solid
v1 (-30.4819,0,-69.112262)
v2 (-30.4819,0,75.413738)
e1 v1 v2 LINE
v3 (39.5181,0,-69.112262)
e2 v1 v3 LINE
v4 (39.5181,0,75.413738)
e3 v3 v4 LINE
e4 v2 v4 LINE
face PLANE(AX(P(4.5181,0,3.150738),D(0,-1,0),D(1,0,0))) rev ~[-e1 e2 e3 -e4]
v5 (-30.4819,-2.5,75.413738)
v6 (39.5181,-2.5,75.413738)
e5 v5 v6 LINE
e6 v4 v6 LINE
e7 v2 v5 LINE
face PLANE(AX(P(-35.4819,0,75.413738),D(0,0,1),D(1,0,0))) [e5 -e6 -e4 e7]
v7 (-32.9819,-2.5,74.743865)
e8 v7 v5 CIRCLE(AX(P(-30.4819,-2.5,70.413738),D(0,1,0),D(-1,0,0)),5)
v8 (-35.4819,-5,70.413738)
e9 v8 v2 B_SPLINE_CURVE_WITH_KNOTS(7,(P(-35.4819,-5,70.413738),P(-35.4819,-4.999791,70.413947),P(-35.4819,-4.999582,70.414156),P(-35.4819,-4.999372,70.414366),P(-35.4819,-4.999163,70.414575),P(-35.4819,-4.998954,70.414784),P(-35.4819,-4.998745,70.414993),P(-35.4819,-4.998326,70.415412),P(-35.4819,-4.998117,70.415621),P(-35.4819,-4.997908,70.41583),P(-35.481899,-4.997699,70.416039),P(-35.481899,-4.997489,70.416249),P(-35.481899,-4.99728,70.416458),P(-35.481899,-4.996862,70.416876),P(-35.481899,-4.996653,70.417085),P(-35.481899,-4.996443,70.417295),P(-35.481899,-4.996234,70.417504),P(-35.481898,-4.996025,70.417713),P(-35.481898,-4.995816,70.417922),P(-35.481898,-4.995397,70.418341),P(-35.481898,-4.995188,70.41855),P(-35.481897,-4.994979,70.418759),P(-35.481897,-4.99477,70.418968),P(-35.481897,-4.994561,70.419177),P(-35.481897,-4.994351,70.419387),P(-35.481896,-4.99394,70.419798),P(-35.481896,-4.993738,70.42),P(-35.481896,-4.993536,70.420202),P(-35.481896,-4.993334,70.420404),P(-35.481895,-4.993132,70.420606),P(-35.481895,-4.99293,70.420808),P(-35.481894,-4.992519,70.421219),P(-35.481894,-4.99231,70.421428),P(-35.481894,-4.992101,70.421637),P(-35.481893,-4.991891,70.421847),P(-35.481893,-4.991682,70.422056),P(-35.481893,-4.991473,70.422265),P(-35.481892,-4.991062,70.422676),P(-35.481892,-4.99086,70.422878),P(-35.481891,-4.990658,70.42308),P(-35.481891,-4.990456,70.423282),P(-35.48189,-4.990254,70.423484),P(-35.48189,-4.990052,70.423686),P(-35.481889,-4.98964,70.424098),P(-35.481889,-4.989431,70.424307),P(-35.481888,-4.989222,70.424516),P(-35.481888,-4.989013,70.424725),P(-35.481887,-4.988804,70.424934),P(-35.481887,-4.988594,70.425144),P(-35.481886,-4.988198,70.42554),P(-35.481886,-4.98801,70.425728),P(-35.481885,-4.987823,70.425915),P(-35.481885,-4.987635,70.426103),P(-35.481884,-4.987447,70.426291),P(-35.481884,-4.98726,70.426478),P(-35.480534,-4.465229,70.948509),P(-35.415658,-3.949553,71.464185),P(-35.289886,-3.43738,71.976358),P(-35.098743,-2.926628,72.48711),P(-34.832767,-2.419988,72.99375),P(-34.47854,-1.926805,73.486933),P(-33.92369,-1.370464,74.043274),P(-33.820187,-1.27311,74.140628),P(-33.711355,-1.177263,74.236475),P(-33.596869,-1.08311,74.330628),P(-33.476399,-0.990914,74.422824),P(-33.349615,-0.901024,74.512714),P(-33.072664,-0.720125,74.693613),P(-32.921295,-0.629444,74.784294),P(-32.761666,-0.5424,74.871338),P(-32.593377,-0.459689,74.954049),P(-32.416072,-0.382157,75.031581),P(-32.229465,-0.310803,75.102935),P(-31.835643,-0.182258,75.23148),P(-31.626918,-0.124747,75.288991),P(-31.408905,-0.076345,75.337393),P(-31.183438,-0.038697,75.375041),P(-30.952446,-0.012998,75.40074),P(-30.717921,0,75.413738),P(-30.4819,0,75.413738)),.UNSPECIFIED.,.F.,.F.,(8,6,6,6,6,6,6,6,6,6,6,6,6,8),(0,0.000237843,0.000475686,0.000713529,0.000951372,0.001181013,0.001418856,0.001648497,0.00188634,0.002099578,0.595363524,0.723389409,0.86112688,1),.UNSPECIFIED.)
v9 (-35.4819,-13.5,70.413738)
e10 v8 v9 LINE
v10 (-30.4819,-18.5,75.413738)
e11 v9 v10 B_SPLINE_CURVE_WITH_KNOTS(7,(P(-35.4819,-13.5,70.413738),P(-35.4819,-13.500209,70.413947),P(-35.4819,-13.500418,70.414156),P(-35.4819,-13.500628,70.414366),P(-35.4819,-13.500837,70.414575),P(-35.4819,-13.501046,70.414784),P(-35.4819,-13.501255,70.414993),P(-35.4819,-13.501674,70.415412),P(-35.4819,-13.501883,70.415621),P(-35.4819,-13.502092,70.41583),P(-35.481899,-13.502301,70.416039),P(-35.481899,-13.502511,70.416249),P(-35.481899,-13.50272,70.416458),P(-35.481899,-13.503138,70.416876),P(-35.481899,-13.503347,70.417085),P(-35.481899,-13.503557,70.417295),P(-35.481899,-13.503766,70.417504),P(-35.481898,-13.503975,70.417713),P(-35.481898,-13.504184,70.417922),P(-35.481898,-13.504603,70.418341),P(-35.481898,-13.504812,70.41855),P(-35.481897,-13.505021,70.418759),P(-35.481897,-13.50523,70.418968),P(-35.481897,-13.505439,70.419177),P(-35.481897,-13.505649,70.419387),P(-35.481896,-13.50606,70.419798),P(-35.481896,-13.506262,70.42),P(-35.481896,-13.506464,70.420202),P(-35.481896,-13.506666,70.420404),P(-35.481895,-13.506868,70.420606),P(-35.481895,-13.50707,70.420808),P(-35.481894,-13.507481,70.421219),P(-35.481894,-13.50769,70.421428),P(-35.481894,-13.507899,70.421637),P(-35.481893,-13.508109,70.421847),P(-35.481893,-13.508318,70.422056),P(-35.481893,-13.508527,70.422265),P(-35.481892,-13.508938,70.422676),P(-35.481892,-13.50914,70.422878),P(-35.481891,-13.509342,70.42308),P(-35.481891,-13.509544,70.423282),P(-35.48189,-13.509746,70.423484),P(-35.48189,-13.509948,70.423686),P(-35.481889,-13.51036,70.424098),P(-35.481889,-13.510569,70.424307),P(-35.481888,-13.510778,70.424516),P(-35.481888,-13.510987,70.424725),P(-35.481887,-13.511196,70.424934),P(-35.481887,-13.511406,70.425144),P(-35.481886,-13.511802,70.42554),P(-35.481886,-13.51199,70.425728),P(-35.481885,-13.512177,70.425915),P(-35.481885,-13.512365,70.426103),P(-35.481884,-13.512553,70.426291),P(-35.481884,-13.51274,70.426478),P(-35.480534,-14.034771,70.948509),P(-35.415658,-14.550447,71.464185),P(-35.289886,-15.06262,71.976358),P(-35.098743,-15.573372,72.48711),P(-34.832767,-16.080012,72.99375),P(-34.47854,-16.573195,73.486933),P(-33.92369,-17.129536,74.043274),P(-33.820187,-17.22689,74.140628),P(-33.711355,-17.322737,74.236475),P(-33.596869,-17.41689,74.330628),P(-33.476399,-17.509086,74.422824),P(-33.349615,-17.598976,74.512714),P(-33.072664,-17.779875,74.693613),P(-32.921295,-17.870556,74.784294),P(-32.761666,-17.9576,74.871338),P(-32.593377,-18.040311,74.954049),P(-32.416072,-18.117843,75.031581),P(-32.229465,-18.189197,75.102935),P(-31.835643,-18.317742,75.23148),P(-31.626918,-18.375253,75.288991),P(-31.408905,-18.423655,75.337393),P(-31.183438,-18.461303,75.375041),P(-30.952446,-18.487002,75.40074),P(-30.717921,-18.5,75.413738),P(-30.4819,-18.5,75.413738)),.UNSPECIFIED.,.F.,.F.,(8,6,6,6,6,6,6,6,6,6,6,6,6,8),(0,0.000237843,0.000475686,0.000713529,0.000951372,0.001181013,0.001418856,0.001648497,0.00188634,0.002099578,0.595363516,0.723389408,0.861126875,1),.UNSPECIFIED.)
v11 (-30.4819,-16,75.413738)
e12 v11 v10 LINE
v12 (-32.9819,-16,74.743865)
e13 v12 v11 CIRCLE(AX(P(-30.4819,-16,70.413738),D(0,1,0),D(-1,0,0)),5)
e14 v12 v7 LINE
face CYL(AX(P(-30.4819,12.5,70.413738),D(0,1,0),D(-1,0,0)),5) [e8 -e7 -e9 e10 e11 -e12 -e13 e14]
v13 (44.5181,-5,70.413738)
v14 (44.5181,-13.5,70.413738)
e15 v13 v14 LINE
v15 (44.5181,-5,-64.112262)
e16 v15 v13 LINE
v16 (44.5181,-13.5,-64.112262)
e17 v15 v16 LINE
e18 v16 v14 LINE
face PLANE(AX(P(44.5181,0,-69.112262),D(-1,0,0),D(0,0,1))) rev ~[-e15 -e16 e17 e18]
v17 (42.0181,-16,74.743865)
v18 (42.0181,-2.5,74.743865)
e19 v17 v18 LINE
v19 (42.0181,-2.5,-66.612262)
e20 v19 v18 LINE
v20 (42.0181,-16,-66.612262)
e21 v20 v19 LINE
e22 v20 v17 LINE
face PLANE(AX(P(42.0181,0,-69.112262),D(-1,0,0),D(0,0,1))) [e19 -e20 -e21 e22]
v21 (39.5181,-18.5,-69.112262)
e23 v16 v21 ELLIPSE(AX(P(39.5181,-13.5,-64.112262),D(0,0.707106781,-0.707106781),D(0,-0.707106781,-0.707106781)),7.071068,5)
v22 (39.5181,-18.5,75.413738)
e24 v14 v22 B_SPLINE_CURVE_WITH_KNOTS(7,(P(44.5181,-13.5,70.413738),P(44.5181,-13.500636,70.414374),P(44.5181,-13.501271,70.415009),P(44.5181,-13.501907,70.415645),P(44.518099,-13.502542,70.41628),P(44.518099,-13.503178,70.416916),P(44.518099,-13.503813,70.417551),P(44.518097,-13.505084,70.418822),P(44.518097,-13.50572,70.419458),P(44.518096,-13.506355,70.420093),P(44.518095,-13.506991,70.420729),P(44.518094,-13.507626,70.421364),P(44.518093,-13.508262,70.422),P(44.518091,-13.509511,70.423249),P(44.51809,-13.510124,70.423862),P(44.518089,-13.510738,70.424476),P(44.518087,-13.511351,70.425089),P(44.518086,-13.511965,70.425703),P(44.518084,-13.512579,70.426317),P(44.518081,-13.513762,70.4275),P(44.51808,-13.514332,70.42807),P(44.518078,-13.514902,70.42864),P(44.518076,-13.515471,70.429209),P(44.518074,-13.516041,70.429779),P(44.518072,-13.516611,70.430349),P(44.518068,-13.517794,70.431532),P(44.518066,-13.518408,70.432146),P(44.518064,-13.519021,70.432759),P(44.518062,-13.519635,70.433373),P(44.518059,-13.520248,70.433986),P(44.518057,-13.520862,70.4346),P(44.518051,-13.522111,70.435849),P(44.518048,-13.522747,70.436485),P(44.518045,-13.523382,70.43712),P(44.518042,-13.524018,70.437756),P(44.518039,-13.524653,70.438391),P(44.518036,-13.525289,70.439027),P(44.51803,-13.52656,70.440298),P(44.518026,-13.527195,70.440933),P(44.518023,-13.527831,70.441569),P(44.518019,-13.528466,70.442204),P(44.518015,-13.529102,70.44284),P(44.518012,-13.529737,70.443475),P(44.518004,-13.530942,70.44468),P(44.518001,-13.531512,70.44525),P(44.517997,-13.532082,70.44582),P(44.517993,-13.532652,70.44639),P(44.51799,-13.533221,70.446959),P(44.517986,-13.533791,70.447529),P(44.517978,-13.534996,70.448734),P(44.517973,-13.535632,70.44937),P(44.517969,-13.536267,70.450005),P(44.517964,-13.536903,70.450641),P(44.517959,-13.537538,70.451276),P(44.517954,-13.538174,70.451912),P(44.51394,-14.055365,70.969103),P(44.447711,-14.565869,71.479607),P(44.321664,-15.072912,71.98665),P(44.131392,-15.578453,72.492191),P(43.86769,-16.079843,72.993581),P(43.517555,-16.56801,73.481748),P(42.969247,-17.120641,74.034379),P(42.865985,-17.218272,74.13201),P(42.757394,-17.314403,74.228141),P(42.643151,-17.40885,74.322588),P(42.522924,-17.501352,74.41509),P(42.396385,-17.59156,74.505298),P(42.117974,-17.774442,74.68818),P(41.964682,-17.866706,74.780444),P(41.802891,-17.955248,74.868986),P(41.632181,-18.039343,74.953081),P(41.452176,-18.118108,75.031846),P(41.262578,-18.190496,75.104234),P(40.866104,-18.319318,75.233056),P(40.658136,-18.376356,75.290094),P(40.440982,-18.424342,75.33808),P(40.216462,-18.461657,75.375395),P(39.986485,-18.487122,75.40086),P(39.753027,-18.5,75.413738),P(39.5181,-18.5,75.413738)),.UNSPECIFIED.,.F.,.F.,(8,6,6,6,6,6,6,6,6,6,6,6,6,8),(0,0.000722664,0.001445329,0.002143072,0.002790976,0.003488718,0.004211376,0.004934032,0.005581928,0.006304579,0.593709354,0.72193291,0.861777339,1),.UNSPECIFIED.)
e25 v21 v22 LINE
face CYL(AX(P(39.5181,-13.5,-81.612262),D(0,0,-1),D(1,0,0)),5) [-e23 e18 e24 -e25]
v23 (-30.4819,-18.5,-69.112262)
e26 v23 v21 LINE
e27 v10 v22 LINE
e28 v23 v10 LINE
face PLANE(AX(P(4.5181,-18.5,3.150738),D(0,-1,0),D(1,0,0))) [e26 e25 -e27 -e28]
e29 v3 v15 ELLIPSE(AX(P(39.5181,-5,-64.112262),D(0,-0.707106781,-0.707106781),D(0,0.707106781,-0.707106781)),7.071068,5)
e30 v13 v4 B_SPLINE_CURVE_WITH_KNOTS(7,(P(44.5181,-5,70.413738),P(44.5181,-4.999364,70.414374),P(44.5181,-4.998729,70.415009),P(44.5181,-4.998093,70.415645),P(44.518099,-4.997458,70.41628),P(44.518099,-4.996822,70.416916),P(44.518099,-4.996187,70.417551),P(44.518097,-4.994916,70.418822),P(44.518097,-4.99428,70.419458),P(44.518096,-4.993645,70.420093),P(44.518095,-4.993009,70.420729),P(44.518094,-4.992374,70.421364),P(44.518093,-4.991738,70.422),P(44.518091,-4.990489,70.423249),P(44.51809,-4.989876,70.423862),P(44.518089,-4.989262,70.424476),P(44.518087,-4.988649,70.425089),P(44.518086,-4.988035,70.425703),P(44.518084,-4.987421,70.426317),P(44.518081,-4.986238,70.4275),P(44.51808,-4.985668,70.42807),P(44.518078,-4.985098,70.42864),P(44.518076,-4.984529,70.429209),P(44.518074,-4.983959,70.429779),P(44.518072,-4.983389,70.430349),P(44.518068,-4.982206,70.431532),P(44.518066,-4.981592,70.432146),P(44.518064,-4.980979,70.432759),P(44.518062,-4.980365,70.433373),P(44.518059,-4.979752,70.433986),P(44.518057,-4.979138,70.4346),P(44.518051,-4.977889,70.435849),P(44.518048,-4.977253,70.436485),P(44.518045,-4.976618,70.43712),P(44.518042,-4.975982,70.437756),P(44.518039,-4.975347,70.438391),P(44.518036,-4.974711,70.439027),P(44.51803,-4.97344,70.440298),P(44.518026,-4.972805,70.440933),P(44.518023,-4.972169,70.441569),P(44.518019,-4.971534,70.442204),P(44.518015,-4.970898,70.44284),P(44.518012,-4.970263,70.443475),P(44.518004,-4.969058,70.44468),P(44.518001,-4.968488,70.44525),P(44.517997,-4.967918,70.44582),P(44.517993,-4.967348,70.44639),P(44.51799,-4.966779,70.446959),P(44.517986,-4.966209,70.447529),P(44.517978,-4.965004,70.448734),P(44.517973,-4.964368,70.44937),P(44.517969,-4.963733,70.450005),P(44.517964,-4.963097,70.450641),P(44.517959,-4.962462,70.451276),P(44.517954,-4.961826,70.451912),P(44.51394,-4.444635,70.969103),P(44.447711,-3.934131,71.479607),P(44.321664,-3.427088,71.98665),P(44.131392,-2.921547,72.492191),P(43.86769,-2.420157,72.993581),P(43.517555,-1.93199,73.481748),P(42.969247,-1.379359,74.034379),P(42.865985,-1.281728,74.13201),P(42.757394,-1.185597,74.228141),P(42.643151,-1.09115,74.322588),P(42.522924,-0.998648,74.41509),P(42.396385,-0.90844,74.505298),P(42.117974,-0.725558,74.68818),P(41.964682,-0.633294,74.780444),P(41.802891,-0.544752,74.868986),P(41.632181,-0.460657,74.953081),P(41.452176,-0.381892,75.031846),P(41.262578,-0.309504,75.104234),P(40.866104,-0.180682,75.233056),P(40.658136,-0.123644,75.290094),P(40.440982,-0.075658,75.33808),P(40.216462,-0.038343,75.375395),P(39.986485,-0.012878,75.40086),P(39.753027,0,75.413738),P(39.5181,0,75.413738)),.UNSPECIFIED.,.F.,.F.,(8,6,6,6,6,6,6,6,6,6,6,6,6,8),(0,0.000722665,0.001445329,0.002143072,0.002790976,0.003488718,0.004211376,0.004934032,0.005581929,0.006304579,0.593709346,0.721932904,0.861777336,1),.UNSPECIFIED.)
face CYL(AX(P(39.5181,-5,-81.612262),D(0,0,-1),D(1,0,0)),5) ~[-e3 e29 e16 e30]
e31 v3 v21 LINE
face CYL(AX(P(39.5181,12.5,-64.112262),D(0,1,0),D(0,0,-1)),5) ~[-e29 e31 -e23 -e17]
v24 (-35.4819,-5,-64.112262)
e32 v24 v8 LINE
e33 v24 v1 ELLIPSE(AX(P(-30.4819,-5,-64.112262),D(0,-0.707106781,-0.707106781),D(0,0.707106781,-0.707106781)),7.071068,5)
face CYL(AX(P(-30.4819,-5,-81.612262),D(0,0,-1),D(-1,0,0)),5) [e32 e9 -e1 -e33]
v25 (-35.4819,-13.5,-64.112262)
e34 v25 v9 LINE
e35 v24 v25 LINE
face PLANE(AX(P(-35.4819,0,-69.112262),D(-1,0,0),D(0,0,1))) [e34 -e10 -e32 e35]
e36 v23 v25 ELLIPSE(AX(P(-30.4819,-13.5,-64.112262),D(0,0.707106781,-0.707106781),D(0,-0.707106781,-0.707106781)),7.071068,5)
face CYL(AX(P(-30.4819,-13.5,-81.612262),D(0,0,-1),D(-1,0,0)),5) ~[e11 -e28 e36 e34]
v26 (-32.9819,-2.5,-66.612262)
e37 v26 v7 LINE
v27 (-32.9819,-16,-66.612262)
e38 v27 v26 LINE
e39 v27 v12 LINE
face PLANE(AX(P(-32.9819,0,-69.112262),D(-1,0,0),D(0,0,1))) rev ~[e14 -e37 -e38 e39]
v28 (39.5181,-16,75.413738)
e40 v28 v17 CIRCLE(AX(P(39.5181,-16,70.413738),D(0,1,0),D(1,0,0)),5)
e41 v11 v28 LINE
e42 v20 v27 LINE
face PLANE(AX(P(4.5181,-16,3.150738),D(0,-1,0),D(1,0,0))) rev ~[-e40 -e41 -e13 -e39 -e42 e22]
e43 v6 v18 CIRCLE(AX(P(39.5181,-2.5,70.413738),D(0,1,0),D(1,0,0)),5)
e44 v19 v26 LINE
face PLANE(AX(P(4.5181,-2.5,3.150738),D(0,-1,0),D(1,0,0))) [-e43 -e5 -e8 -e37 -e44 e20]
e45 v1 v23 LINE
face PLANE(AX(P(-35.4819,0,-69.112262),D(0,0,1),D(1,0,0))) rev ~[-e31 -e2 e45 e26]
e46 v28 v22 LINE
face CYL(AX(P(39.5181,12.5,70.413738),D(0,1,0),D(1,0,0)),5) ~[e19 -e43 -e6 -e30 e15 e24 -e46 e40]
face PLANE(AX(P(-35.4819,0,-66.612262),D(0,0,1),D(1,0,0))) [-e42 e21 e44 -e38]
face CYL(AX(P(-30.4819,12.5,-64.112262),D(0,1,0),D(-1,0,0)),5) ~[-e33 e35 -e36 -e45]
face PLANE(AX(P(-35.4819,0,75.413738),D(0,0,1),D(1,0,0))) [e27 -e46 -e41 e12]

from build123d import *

# Parameters (mm, degrees)
F0_W        = 80
F0_H        = 144.526
F1_DEPTH    = 18.5
F2_T        = -2.5
F3_T1_DEPTH = 169.526
F3_T3_DEPTH = 43.5


# Not quite as in the source:
# - a fillet or chamfer that OpenCascade refuses, or shapes differently, is made with other operations: its cross-section is extruded or revolved along the edge and cut away or added


with BuildPart() as f1:
    # F0 (on Front) → F1 (new body)
    with BuildSketch(Plane.XZ):
        with Locations((4.5181000233, 3.1507380013)):
            Rectangle(F0_W, F0_H)
    extrude(amount=F1_DEPTH)

    # F2
    f2_openings = [f1.faces().sort_by_distance(p)[0] for p in [
        (4.5181, -9.25, 75.413738),
    ]]
    offset(amount=F2_T, openings=f2_openings)

    # F3: fillet of radius 5 on 8 edges, made by hand

    # F3_s2 → F3_t1 (cut)
    with BuildSketch(Plane.XY.offset(-81.6122619987)):
        with BuildLine():
            ThreePointArc((-35.4818999767, -13.5), (-34.0174338827, -17.0355339059), (-30.4818999767, -18.5))
            Line((-30.4818999767, -18.5), (-35.4818999767, -18.5))
            Line((-35.4818999767, -18.5), (-35.4818999767, -13.5))
        make_face()
        with BuildLine():
            ThreePointArc((-35.4818999767, -5), (-34.0174338827, -1.4644660941), (-30.4818999767, 0))
            Line((-30.4818999767, 0), (-35.4818999767, 0))
            Line((-35.4818999767, 0), (-35.4818999767, -5))
        make_face()
        with BuildLine():
            ThreePointArc((44.5181000233, -13.5), (43.0536339292, -17.0355339059), (39.5181000233, -18.5))
            Line((39.5181000233, -18.5), (44.5181000233, -18.5))
            Line((44.5181000233, -18.5), (44.5181000233, -13.5))
        make_face()
        with BuildLine():
            ThreePointArc((44.5181000233, -5), (43.0536339292, -1.4644660941), (39.5181000233, 0))
            Line((39.5181000233, 0), (44.5181000233, 0))
            Line((44.5181000233, 0), (44.5181000233, -5))
        make_face()
    extrude(amount=F3_T1_DEPTH, mode=Mode.SUBTRACT)

    # F3_s4 → F3_t3 (cut)
    with BuildSketch(Plane.XZ.offset(-12.5)):
        with BuildLine():
            ThreePointArc((44.5181000233, 70.4137380013), (43.0536339292, 73.9492719073), (39.5181000233, 75.4137380013))
            Line((39.5181000233, 75.4137380013), (44.5181000233, 75.4137380013))
            Line((44.5181000233, 75.4137380013), (44.5181000233, 70.4137380013))
        make_face()
        with BuildLine():
            ThreePointArc((-35.4818999767, 70.4137380013), (-34.0174338827, 73.9492719073), (-30.4818999767, 75.4137380013))
            Line((-30.4818999767, 75.4137380013), (-35.4818999767, 75.4137380013))
            Line((-35.4818999767, 75.4137380013), (-35.4818999767, 70.4137380013))
        make_face()
        with BuildLine():
            ThreePointArc((-35.4818999767, -64.1122619987), (-34.0174338827, -67.6477959046), (-30.4818999767, -69.1122619987))
            Line((-30.4818999767, -69.1122619987), (-35.4818999767, -69.1122619987))
            Line((-35.4818999767, -69.1122619987), (-35.4818999767, -64.1122619987))
        make_face()
        with BuildLine():
            ThreePointArc((39.5181000233, -69.1122619987), (43.0536339292, -67.6477959046), (44.5181000233, -64.1122619987))
            Line((44.5181000233, -64.1122619987), (44.5181000233, -69.1122619987))
            Line((44.5181000233, -69.1122619987), (39.5181000233, -69.1122619987))
        make_face()
    extrude(amount=F3_T3_DEPTH, mode=Mode.SUBTRACT)


solid = f1.part
